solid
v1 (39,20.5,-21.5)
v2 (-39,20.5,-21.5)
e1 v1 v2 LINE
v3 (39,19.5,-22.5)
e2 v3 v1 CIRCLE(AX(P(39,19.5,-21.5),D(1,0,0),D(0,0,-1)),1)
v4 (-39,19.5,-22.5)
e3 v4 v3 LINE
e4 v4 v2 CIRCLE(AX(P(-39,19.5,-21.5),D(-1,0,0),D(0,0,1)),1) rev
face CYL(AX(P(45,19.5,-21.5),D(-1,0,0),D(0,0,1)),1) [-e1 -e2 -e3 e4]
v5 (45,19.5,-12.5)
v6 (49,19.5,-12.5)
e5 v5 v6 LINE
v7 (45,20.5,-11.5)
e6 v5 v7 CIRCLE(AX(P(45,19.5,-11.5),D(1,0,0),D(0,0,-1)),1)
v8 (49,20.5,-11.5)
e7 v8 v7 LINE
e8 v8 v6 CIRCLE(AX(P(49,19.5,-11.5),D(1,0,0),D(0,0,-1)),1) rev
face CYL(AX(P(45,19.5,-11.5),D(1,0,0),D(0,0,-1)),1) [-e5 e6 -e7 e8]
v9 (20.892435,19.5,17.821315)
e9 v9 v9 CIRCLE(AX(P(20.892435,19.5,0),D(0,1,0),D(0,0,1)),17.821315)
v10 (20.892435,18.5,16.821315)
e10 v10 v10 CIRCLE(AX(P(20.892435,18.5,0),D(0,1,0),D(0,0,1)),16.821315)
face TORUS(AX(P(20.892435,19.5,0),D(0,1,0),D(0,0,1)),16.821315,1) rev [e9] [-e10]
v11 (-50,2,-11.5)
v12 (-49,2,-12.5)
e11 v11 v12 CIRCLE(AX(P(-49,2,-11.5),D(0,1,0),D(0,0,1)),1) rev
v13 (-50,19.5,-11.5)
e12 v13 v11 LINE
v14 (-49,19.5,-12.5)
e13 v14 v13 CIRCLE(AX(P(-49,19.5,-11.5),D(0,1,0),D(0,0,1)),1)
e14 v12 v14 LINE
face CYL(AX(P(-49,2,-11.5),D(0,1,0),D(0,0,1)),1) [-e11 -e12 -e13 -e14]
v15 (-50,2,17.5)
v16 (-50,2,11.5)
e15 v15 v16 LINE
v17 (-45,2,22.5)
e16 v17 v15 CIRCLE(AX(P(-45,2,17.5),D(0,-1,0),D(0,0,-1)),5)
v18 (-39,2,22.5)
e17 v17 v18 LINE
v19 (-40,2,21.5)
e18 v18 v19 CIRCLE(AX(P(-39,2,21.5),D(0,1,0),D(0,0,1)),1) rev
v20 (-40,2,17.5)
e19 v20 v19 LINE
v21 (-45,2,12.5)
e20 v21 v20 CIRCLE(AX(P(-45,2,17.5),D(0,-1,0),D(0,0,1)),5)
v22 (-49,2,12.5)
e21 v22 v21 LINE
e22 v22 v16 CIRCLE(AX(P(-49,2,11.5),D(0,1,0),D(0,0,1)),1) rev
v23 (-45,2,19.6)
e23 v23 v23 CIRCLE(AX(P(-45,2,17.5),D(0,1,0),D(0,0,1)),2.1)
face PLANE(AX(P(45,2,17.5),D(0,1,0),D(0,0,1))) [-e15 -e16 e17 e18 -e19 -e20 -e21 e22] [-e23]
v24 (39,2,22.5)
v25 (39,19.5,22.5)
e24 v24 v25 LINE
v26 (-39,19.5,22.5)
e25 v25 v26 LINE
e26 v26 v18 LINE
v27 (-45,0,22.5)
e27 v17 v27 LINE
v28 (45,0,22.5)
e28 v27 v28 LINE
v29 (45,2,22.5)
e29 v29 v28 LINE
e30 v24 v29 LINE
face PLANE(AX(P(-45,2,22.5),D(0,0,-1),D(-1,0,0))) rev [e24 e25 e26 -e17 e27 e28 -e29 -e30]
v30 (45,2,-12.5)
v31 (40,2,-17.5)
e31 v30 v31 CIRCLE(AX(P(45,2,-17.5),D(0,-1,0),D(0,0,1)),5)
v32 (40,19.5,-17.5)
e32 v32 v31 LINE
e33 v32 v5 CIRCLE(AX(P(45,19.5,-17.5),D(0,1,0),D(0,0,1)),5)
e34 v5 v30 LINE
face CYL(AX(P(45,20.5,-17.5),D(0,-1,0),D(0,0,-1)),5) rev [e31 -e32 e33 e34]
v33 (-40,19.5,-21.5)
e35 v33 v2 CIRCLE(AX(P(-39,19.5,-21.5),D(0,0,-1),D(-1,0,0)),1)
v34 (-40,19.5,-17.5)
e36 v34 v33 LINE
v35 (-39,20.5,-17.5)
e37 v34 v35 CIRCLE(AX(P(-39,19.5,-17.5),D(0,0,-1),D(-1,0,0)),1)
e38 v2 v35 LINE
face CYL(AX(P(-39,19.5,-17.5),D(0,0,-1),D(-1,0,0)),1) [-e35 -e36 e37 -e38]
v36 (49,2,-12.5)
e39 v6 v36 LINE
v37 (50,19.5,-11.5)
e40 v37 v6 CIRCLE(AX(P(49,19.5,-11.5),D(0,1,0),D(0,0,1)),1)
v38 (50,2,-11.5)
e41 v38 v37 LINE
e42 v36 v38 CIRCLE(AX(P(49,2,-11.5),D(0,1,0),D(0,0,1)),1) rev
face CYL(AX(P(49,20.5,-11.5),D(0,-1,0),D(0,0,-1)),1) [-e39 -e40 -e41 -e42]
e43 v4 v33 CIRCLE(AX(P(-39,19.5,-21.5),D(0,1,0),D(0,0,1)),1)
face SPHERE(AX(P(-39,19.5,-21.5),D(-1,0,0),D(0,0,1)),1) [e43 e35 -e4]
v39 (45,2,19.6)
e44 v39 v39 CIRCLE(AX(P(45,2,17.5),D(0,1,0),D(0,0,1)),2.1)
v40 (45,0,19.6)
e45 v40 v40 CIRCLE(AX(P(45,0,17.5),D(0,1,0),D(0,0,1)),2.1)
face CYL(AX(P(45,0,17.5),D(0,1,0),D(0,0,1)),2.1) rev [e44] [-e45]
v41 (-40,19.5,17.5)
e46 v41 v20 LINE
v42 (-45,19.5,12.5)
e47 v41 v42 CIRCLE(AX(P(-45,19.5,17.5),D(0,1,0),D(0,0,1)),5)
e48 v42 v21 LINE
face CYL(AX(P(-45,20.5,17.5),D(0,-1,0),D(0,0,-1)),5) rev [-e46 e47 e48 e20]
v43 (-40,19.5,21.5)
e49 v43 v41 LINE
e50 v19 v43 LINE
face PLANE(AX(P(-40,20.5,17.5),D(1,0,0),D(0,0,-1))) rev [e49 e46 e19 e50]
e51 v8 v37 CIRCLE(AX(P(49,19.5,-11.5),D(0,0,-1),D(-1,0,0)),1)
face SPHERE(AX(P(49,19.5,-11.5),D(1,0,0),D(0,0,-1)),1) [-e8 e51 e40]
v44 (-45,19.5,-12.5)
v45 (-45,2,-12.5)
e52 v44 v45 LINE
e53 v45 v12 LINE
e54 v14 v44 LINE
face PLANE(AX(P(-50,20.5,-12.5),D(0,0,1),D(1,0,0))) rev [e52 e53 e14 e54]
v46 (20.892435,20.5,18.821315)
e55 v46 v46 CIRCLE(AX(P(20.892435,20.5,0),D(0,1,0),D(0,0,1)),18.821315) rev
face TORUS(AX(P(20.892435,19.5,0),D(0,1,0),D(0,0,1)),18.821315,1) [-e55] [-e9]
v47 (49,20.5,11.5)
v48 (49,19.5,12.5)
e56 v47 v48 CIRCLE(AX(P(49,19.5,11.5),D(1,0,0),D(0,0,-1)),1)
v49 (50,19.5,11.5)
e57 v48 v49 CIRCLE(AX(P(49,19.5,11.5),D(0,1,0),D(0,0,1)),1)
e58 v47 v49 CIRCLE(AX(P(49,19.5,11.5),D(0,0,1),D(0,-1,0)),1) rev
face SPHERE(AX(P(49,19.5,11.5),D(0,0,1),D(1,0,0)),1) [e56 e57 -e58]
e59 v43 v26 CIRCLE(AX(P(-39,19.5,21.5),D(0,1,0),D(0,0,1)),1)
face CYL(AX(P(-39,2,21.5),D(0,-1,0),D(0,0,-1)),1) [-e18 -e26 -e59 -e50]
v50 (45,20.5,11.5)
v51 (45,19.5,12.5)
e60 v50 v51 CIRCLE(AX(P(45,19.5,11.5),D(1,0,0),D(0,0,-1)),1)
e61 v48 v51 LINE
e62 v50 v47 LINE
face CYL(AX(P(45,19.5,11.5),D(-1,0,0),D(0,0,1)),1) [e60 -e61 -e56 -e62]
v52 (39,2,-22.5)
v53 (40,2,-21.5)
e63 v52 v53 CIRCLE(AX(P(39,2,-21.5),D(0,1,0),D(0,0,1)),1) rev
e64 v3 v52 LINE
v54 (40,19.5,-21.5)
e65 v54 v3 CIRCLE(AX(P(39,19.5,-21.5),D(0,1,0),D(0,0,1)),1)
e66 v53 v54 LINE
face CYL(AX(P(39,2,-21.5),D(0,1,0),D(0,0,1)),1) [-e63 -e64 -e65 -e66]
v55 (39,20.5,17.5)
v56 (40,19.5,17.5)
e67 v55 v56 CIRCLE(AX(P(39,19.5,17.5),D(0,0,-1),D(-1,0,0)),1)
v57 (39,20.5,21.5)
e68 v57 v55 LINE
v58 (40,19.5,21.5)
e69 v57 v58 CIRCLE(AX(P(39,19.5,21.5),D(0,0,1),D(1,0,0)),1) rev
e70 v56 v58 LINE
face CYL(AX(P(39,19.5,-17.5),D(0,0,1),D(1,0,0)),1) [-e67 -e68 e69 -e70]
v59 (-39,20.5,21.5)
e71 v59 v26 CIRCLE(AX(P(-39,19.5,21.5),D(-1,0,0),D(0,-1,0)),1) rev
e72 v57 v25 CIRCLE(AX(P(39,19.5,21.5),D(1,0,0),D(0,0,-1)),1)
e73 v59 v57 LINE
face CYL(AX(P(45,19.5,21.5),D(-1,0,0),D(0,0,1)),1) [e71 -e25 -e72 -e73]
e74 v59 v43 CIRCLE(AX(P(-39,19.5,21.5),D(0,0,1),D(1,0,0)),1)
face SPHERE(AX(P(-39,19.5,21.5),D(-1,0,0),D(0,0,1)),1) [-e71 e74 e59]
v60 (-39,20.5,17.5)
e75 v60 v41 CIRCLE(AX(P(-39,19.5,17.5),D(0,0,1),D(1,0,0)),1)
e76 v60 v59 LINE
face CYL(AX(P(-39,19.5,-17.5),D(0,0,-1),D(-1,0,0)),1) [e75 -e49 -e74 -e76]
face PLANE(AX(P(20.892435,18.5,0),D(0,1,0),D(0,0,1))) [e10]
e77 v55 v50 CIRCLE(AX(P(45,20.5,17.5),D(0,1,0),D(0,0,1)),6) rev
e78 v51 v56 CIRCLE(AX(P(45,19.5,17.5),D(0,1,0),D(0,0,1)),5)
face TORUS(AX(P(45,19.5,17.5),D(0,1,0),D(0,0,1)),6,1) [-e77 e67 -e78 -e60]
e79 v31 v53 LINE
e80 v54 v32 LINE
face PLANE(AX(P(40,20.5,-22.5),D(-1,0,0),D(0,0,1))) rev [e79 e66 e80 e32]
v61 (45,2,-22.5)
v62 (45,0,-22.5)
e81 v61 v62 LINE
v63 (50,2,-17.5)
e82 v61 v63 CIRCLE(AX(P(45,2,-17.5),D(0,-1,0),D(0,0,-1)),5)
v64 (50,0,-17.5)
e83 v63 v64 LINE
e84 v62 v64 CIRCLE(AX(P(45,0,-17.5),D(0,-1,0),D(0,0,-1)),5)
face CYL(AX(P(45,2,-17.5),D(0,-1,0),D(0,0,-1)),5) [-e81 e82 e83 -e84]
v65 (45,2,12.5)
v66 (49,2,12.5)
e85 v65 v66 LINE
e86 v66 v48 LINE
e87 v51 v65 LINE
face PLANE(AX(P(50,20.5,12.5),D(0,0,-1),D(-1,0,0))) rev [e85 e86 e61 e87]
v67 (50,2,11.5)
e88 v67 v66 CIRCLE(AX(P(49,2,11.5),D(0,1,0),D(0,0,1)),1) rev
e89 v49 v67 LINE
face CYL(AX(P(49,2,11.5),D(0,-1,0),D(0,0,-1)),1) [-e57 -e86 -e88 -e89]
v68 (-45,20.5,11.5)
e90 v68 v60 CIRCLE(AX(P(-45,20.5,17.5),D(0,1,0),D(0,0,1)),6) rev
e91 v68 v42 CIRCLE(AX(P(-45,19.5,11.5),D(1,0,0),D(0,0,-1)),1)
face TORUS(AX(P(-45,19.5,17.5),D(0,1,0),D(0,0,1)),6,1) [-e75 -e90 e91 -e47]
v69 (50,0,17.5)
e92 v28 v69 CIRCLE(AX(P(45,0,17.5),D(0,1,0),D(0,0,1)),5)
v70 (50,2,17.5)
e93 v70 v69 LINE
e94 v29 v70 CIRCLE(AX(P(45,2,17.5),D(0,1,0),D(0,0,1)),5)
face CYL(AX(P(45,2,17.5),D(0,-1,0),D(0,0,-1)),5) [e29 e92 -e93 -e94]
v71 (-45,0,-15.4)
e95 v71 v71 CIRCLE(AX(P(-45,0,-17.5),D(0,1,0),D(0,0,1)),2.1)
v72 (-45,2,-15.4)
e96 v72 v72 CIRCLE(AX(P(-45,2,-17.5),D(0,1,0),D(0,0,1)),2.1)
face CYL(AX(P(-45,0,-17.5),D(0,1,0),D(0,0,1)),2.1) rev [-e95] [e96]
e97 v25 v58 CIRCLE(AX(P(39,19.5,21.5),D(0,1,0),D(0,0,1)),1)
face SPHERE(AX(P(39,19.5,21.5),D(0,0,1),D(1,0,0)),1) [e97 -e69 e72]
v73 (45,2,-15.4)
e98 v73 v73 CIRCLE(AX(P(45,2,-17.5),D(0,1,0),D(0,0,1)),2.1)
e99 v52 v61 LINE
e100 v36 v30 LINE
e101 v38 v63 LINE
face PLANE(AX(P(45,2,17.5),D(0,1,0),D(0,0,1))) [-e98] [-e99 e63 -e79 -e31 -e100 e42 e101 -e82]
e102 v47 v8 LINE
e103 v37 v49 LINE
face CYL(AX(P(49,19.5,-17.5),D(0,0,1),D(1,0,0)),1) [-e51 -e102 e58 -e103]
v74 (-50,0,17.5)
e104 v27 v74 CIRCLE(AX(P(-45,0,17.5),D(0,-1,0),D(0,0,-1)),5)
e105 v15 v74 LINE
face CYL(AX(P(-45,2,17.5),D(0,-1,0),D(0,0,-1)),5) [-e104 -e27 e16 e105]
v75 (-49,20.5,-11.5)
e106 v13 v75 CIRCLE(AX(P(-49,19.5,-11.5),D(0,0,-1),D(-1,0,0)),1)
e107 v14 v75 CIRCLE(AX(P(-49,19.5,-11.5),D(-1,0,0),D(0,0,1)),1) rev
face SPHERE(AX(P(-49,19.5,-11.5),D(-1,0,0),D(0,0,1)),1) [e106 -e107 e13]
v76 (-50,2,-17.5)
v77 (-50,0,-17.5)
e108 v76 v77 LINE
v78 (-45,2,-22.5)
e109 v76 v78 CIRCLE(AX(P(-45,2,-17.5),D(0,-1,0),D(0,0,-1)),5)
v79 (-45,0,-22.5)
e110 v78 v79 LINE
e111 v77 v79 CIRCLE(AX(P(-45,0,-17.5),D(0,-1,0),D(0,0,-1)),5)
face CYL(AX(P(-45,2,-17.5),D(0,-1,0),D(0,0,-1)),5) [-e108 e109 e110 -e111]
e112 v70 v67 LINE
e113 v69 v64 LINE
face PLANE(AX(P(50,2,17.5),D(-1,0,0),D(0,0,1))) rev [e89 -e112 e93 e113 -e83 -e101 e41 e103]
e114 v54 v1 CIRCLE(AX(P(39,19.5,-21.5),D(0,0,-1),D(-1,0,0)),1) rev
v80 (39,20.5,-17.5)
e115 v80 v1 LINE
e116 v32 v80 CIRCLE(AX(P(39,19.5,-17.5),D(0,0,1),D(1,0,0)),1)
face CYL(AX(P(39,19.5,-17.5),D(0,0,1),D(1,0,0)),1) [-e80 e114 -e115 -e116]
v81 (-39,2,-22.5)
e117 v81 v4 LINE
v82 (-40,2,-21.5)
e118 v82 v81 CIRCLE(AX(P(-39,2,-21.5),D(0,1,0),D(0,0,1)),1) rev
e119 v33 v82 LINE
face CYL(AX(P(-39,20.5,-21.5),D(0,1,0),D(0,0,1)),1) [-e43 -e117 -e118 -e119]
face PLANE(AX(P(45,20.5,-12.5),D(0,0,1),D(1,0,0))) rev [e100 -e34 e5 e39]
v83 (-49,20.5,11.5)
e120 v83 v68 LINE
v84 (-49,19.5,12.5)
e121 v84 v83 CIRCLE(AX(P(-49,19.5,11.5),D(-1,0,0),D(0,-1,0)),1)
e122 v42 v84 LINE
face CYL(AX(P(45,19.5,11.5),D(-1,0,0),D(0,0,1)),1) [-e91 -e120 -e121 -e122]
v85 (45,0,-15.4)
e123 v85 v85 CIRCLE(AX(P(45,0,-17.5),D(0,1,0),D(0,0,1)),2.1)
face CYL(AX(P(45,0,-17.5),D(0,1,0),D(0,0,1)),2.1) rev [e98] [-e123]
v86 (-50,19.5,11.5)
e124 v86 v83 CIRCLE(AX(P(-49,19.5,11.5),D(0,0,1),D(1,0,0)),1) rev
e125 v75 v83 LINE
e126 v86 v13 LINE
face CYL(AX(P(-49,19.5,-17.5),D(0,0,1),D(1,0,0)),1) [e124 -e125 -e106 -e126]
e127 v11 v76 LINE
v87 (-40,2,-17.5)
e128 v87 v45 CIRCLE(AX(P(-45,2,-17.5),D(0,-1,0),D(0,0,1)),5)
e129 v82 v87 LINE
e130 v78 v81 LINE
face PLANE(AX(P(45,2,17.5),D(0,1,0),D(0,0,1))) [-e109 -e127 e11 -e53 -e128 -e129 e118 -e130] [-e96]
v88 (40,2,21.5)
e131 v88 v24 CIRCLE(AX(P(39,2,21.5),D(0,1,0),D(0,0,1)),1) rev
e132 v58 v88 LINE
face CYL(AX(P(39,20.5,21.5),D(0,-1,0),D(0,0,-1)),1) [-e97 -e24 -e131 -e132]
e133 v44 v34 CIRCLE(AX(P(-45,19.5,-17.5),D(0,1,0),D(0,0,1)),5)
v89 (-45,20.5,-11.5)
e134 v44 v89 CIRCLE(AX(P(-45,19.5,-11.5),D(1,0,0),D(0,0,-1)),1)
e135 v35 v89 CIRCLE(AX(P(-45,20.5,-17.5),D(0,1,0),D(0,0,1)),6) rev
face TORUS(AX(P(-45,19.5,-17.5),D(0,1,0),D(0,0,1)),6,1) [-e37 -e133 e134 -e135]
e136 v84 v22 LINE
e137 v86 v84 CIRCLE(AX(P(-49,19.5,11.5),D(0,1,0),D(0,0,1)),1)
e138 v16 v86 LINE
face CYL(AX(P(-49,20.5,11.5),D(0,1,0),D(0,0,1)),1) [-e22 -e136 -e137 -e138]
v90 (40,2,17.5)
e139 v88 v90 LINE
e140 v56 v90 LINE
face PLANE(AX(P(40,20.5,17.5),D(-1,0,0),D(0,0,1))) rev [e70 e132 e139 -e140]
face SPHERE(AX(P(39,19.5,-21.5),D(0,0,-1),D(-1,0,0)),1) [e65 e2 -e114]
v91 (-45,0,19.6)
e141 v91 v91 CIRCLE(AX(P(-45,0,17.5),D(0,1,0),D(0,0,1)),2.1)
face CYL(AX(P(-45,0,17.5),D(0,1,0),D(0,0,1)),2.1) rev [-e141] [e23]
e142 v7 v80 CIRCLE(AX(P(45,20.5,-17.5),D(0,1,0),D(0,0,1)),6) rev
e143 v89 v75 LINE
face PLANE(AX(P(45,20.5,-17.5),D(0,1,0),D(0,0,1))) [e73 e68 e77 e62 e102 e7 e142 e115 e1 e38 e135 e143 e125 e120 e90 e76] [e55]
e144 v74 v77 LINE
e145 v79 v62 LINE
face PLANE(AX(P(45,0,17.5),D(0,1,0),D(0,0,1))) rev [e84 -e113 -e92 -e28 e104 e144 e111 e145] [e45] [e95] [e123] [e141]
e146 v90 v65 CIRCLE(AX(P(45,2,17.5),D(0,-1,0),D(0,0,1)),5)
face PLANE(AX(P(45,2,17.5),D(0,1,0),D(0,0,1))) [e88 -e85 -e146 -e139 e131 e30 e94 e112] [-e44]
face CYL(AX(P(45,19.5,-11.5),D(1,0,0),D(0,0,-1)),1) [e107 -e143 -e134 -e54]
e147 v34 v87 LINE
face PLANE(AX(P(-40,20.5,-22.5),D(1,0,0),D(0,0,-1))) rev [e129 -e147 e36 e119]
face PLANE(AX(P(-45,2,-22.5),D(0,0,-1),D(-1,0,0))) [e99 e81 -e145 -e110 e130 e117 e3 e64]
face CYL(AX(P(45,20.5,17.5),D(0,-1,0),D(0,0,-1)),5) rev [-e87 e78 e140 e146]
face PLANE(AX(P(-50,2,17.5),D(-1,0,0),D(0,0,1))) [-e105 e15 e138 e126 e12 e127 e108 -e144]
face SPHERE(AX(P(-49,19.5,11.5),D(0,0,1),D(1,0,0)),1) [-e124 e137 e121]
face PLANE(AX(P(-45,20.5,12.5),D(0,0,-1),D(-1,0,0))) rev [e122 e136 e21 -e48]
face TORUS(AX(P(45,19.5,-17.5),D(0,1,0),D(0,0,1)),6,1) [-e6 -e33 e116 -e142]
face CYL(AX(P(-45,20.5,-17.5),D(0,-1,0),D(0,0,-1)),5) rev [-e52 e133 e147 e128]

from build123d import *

# Parameters (mm, degrees)
EXTRUDE_1_DEPTH     = 2
EXTRUDE_3_DEPTH     = 18.5
FILLET_1_R          = 1
SKETCH_4_R          = 17.821315346
CUT_EXTRUDE_1_DEPTH = 2
FILLET_2_R          = 1
SKETCH_5_R          = 2.1
CUT_EXTRUDE_2_DEPTH = 2


with BuildPart() as part:
    # 草图1 → 凸台-拉伸1 (new body)
    with BuildSketch(Plane(origin=(0, 0, 0), x_dir=(1, 0, 0), z_dir=(0, 1, 0))):
        with BuildLine():
            Line((-45, -22.5), (45, -22.5))
            ThreePointArc((45, -22.5), (48.535533906, -21.035533906), (50, -17.5))
            Line((50, -17.5), (50, 17.5))
            ThreePointArc((50, 17.5), (48.535533906, 21.035533906), (45, 22.5))
            Line((45, 22.5), (-45, 22.5))
            ThreePointArc((-45, 22.5), (-48.535533906, 21.035533906), (-50, 17.5))
            Line((-50, 17.5), (-50, -17.5))
            ThreePointArc((-50, -17.5), (-48.535533906, -21.035533906), (-45, -22.5))
        make_face()
    extrude(amount=EXTRUDE_1_DEPTH)

    # 草图2 → 凸台-拉伸3 (add)
    with BuildSketch(Plane(origin=(0, 2, 0), x_dir=(1, 0, 0), z_dir=(0, 1, 0))):
        with BuildLine():
            Line((-40, 22.5), (-40, 17.5))
            ThreePointArc((-40, 17.5), (-41.464466094, 13.964466094), (-45, 12.5))
            Line((-45, 12.5), (-50, 12.5))
            Line((-50, 12.5), (-50, -12.5))
            Line((-50, -12.5), (-45, -12.5))
            ThreePointArc((-45, -12.5), (-41.464466094, -13.964466094), (-40, -17.5))
            Line((-40, -17.5), (-40, -22.5))
            Line((-40, -22.5), (40, -22.5))
            Line((40, -22.5), (40, -17.5))
            ThreePointArc((40, -17.5), (41.464466094, -13.964466094), (45, -12.5))
            Line((45, -12.5), (50, -12.5))
            Line((50, -12.5), (50, 12.5))
            Line((50, 12.5), (45, 12.5))
            ThreePointArc((45, 12.5), (41.464466094, 13.964466094), (40, 17.5))
            Line((40, 17.5), (40, 22.5))
            Line((40, 22.5), (-40, 22.5))
        make_face()
    extrude(amount=EXTRUDE_3_DEPTH)

    # 圆角1
    fillet_1_edges = [part.edges().sort_by_distance(p)[0] for p in [
        (40, 11.25, -22.5),
        (-40, 11.25, -22.5),
        (-50, 11.25, -12.5),
        (-50, 11.25, 12.5),
        (-40, 11.25, 22.5),
        (40, 11.25, 22.5),
        (50, 11.25, 12.5),
        (50, 11.25, -12.5),
        (41.464466094, 20.5, -13.964466094),
        (40, 20.5, -20),
        (0, 20.5, -22.5),
        (-40, 20.5, -20),
        (-41.464466094, 20.5, -13.964466094),
        (-47.5, 20.5, -12.5),
        (-50, 20.5, 0),
        (-47.5, 20.5, 12.5),
        (-41.464466094, 20.5, 13.964466094),
        (-40, 20.5, 20),
        (0, 20.5, 22.5),
        (40, 20.5, 20),
        (41.464466094, 20.5, 13.964466094),
        (47.5, 20.5, 12.5),
        (50, 20.5, 0),
        (47.5, 20.5, -12.5),
    ]]
    fillet(fillet_1_edges, radius=FILLET_1_R)

    # 草图4 → 切除-拉伸1 (cut)
    with BuildSketch(Plane(origin=(0, 20.5, 0), x_dir=(1, 0, 0), z_dir=(0, 1, 0))):
        with Locations(Location((20.892434564, 0, 0), (0, 0, 270))):
            Circle(SKETCH_4_R)
    extrude(amount=-CUT_EXTRUDE_1_DEPTH, mode=Mode.SUBTRACT)

    # 圆角2
    fillet_2_edges = [part.edges().sort_by_distance(p)[0] for p in [
        (20.892434564, 18.5, -17.821315346),
        (20.892434564, 20.5, -17.821315346),
    ]]
    fillet(fillet_2_edges, radius=FILLET_2_R - 0.0001)  # a hair under: the kernel refuses the full size

    # 草图5 → 切除-拉伸2 (cut)
    with BuildSketch(Plane(origin=(0, 2, 0), x_dir=(1, 0, 0), z_dir=(0, 1, 0))):
        with Locations(Location((-45, 17.5, 0), (0, 0, 270))):
            Circle(SKETCH_5_R)
        with Locations(Location((45, 17.5, 0), (0, 0, 270))):
            Circle(SKETCH_5_R)
        with Locations(Location((45, -17.5, 0), (0, 0, 270))):
            Circle(SKETCH_5_R)
        with Locations(Location((-45, -17.5, 0), (0, 0, 270))):
            Circle(SKETCH_5_R)
    extrude(amount=-CUT_EXTRUDE_2_DEPTH, mode=Mode.SUBTRACT)


solid = part.part
